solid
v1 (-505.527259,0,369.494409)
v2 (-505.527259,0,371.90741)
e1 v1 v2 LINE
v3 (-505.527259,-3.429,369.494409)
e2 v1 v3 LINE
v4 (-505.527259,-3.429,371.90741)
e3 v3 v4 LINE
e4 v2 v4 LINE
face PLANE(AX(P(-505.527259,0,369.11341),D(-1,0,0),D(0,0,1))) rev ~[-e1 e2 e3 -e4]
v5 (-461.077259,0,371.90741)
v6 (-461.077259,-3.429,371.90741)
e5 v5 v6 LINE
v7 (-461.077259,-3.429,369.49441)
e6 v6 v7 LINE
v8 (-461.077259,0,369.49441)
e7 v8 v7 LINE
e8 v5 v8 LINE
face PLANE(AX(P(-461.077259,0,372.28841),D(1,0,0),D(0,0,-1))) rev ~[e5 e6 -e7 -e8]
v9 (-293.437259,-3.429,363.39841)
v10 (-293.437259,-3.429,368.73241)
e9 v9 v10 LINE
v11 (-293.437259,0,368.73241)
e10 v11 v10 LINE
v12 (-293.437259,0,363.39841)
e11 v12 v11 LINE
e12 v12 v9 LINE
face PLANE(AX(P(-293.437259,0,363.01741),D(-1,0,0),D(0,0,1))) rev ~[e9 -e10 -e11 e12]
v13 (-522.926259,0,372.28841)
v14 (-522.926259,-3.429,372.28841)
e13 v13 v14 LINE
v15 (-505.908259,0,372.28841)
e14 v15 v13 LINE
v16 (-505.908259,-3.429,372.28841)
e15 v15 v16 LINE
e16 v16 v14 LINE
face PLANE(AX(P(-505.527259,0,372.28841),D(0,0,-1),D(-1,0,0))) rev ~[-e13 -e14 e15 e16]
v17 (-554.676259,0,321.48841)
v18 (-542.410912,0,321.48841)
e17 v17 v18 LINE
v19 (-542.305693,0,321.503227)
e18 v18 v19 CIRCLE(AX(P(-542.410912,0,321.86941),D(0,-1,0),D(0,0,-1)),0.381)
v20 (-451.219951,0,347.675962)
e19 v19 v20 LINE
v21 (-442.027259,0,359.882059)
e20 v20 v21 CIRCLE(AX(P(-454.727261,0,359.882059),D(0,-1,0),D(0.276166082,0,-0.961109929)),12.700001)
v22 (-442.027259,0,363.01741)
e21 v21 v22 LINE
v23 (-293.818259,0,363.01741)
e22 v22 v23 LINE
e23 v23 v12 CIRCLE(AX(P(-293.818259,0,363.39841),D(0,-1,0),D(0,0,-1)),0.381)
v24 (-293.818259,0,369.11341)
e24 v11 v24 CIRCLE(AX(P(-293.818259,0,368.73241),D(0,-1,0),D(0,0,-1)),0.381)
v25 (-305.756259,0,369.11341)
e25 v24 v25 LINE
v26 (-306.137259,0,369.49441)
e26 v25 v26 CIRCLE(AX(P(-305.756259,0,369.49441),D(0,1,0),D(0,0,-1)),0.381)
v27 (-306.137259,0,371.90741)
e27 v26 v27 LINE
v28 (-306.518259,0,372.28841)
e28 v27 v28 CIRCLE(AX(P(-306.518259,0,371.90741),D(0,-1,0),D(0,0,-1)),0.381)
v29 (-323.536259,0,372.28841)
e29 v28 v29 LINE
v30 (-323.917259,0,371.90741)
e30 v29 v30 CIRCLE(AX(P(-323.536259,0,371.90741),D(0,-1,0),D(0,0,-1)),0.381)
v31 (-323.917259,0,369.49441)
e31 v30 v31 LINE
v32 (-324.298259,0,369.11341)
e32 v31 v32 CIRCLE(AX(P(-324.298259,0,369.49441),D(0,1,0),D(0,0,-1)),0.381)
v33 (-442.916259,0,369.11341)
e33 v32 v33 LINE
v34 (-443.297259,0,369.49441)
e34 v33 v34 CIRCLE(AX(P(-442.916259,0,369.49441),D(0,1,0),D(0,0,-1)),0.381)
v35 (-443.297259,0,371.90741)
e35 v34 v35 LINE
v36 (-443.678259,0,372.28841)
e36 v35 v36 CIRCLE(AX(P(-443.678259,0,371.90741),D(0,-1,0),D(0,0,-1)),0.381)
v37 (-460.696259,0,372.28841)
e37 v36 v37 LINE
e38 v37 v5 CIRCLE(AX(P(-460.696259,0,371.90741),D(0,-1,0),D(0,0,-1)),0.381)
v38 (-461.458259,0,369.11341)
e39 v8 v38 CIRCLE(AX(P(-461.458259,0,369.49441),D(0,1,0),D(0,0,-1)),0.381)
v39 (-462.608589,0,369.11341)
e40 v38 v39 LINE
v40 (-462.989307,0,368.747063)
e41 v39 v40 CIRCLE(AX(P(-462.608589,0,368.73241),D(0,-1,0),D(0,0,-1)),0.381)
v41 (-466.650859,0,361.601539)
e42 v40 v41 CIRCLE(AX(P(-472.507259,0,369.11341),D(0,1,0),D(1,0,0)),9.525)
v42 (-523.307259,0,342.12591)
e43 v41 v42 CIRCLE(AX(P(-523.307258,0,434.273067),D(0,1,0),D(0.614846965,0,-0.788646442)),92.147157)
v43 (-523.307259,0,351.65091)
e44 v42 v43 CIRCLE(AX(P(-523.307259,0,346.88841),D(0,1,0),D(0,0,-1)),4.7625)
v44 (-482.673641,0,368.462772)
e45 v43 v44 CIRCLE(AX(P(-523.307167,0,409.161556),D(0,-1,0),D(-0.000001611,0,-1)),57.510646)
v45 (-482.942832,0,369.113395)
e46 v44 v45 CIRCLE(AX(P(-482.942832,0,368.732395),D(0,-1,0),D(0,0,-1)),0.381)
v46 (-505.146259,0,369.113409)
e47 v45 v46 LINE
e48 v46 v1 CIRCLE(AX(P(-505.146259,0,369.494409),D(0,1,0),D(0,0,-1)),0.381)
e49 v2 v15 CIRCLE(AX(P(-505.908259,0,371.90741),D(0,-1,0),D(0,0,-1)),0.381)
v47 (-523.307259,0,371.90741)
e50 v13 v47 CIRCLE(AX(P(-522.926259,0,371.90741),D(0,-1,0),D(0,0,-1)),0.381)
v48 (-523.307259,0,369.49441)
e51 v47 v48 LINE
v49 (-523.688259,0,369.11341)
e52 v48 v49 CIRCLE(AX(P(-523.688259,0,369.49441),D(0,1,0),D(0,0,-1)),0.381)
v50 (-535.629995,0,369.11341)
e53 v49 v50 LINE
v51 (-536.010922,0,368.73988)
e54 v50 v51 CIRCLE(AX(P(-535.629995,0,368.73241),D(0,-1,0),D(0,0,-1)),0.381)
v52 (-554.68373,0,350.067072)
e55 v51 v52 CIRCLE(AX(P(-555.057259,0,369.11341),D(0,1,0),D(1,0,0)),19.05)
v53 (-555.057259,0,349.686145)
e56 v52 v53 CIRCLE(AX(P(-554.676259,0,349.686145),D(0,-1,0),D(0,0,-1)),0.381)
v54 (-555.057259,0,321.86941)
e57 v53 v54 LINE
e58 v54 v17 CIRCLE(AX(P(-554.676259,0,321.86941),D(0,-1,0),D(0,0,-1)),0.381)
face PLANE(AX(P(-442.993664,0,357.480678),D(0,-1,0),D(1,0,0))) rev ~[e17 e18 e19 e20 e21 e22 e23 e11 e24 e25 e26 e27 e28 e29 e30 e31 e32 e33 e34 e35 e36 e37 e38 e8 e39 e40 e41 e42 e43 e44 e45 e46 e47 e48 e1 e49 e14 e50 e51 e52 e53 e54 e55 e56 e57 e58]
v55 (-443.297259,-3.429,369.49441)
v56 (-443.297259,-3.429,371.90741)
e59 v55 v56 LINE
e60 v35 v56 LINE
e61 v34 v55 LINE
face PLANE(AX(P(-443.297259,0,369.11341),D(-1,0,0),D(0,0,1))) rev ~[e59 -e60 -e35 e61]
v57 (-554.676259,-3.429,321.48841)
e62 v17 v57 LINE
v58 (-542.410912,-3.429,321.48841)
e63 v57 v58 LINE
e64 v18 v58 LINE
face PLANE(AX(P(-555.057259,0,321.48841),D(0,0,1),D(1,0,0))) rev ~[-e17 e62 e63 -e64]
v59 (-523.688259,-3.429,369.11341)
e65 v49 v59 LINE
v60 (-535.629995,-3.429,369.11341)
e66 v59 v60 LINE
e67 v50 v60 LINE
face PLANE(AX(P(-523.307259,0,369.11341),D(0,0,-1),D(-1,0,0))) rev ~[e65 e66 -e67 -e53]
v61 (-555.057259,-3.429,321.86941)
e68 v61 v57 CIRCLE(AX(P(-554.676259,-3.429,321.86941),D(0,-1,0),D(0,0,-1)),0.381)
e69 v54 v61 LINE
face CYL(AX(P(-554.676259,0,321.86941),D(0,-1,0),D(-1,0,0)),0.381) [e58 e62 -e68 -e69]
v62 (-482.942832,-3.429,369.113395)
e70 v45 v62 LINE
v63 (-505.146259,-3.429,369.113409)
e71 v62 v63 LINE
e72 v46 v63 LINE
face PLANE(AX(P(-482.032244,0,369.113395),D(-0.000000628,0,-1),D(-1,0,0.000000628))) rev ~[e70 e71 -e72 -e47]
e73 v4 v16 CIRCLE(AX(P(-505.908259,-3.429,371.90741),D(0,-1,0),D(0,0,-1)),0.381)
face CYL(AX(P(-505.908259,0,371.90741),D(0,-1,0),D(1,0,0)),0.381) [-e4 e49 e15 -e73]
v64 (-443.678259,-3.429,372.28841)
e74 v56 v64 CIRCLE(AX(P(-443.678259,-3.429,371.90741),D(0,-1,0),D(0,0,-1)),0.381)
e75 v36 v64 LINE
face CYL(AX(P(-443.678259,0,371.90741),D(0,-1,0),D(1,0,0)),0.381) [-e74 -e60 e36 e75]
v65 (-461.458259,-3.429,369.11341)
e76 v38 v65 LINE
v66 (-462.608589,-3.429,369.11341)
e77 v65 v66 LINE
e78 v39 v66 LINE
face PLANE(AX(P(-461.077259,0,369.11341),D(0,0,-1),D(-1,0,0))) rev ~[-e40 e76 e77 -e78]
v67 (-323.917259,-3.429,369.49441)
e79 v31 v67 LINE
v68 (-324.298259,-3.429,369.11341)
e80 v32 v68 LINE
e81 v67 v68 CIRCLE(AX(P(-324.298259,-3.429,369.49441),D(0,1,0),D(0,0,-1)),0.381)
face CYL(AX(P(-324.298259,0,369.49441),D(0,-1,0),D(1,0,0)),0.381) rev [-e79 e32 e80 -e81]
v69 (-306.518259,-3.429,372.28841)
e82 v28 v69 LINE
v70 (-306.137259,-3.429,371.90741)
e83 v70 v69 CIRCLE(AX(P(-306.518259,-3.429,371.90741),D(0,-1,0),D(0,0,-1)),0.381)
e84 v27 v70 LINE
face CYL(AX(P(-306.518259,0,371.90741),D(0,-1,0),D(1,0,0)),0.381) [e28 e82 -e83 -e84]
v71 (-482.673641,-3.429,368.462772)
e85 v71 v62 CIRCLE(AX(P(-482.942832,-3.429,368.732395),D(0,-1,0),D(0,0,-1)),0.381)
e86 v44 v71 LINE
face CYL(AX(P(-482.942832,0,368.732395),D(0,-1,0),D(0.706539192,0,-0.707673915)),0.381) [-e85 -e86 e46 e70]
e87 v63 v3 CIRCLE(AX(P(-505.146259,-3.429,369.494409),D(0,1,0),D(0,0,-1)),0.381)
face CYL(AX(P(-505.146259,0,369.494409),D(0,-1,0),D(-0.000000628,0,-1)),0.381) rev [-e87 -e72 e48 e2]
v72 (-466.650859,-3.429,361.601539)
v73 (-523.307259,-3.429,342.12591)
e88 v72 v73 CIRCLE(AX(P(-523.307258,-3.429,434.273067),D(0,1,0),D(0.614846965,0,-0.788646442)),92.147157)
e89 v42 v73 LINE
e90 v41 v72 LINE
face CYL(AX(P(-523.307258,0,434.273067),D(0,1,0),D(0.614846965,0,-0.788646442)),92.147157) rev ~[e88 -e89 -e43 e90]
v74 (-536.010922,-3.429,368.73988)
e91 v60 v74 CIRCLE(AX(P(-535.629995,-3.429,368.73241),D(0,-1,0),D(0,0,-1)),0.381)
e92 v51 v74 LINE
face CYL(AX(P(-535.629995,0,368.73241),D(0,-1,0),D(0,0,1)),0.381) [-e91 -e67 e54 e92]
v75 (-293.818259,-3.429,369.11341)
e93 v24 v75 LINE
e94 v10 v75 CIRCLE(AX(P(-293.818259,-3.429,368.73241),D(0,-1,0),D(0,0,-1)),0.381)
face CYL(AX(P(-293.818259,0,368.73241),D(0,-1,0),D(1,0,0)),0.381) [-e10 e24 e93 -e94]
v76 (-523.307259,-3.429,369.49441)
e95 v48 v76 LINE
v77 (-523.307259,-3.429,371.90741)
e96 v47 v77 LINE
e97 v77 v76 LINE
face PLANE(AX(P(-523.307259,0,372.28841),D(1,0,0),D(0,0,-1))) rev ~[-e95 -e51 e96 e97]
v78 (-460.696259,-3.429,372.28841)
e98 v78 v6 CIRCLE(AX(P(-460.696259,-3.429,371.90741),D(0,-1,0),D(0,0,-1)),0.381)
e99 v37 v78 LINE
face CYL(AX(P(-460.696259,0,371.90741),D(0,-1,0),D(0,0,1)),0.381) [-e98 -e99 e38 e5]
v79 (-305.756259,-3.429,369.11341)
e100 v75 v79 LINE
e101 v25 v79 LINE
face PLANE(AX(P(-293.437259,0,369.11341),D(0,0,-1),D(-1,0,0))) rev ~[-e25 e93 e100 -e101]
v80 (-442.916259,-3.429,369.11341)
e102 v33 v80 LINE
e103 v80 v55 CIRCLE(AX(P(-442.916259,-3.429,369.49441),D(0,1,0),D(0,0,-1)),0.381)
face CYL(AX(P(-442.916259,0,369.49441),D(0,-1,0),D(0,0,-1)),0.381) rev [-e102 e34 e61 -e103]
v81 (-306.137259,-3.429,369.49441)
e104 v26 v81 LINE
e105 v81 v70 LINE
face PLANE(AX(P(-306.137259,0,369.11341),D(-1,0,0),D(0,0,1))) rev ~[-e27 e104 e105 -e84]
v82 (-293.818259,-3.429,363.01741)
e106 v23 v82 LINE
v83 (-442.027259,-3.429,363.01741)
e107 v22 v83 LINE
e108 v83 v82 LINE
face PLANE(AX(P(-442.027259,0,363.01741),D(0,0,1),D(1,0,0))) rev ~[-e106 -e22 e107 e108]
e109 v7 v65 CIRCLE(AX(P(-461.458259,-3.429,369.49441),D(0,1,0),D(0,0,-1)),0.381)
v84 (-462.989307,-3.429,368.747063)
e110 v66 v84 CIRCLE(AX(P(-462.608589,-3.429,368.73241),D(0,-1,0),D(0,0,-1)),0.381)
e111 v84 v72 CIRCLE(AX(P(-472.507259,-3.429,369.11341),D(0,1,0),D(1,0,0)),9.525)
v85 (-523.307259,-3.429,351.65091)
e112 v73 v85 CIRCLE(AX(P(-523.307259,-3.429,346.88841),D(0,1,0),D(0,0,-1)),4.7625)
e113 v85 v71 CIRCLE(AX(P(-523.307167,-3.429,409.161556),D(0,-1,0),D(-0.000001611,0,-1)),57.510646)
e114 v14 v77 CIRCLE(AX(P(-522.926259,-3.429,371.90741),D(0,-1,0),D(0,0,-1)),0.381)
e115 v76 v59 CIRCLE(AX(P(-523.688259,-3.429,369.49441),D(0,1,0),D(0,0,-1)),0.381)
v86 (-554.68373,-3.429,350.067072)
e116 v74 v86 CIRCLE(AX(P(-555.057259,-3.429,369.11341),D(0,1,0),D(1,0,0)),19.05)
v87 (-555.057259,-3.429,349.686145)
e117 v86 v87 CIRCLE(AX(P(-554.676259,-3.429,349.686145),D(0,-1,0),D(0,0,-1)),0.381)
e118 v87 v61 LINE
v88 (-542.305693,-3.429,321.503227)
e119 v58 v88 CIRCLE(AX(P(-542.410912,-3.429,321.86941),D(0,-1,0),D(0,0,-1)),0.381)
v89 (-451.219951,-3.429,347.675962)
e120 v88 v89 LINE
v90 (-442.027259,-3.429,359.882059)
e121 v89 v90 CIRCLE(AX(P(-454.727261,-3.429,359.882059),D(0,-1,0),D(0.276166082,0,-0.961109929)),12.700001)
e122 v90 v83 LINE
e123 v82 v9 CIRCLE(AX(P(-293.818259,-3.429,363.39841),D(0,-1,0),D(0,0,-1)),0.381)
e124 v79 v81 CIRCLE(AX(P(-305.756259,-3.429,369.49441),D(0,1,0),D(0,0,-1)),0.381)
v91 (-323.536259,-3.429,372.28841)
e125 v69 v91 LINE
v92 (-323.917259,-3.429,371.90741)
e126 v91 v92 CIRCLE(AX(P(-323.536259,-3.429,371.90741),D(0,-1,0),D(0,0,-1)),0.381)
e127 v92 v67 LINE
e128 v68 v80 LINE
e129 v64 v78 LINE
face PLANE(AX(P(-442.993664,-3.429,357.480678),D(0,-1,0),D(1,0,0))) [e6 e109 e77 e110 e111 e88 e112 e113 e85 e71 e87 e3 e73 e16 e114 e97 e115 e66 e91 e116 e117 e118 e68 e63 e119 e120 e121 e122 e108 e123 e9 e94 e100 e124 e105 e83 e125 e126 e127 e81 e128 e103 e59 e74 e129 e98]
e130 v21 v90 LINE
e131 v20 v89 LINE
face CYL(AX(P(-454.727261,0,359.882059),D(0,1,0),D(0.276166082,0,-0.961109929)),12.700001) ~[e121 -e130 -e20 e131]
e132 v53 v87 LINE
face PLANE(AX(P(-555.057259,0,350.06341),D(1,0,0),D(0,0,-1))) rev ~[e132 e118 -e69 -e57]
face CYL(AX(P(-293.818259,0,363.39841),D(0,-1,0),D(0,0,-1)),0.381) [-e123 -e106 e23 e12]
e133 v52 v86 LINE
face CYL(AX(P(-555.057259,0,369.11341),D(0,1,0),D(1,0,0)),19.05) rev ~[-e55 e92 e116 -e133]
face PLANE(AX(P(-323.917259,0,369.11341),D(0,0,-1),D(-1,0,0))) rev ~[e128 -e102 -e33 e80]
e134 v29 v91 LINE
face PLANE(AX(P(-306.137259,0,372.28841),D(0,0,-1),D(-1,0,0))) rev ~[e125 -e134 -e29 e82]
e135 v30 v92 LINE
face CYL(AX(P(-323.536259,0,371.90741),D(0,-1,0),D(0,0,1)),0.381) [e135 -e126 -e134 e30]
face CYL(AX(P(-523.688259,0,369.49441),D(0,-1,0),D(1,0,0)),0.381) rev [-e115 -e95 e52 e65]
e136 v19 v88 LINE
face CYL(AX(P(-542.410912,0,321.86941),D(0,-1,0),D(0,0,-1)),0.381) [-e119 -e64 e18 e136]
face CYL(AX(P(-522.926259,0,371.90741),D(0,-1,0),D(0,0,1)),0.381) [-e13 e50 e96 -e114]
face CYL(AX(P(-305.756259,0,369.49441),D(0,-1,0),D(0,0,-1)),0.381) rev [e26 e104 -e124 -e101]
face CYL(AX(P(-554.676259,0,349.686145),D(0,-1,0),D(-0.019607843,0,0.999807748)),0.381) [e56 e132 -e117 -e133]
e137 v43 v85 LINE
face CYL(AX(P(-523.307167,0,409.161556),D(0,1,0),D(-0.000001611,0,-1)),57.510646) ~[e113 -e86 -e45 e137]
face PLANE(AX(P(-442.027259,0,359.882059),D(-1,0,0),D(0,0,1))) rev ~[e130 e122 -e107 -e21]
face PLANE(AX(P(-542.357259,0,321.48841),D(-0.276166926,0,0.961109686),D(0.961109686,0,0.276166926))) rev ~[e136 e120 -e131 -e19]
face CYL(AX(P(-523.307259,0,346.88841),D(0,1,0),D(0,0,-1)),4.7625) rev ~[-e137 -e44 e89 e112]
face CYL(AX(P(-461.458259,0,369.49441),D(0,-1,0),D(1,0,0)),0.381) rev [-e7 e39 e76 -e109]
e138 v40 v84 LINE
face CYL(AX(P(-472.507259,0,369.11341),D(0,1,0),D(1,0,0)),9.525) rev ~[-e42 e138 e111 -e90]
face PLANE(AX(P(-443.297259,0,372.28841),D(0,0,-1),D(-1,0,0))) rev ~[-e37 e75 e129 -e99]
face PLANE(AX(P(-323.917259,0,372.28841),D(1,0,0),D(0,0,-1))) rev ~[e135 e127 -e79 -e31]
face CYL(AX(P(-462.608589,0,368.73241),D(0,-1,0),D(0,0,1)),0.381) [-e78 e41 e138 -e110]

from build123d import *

# Parameters (mm, degrees)
F1_DEPTH = 3.429
F2_R     = 0.381


# Not quite as in the source:
# - ends of sketch curves that miss each other by under 0.0002 mm in the source are joined


with BuildPart() as f1:
    # F0 (on Front) → F1 (new body)
    with BuildSketch(Plane.XZ):
        with BuildLine():
            ThreePointArc((-523.3072592, 342.1259096), (-528.0697592, 346.8884096), (-523.3072592, 351.6509096))
            ThreePointArc((-523.3072592, 351.6509096), (-500.8987443088, 356.1961233076), (-482.0322439898, 369.1133948419))
            Line((-482.0322439898, 369.1133948419), (-505.5272592, 369.1134096))
            Line((-505.5272592, 369.1134096), (-505.5272592, 372.2884096))
            Line((-505.5272592, 372.2884096), (-523.3072592, 372.2884096))
            Line((-523.3072592, 372.2884096), (-523.3072592, 369.1134096))
            Line((-523.3072592, 369.1134096), (-536.0072592, 369.1134096))
            ThreePointArc((-536.0072592, 369.1134096), (-541.5868750184, 355.6430254184), (-555.0572592, 350.0634096))
            Line((-555.0572592, 350.0634096), (-555.0572592, 321.4884096))
            Line((-555.0572592, 321.4884096), (-542.3572592, 321.4884096))
            Line((-542.3572592, 321.4884096), (-451.219951, 347.675962))
            ThreePointArc((-451.219951, 347.675962), (-444.5824868492, 352.2417976203), (-442.0272592, 359.882059))
            Line((-442.0272592, 359.882059), (-442.0272592, 363.0174096))
            Line((-442.0272592, 363.0174096), (-293.4372592, 363.0174096))
            Line((-293.4372592, 363.0174096), (-293.4372592, 369.1134096))
            Line((-293.4372592, 369.1134096), (-306.1372592, 369.1134096))
            Line((-306.1372592, 369.1134096), (-306.1372592, 372.2884096))
            Line((-306.1372592, 372.2884096), (-323.9172592, 372.2884096))
            Line((-323.9172592, 372.2884096), (-323.9172592, 369.1134096))
            Line((-323.9172592, 369.1134096), (-443.2972592, 369.1134096))
            Line((-443.2972592, 369.1134096), (-443.2972592, 372.2884096))
            Line((-443.2972592, 372.2884096), (-461.0772592, 372.2884096))
            Line((-461.0772592, 372.2884096), (-461.0772592, 369.1134096))
            Line((-461.0772592, 369.1134096), (-462.9822592, 369.1134096))
            ThreePointArc((-462.9822592, 369.1134096), (-463.9484088233, 364.9334927075), (-466.650858723, 361.601539097))
            ThreePointArc((-466.650858723, 361.601539097), (-493.3520932085, 347.1307312076), (-523.3072592, 342.1259096))
        make_face()
    extrude(amount=F1_DEPTH)

    # F2
    f2_edges = [f1.edges().sort_by_distance(p)[0] for p in [
        (-482.032244, -1.7145, 369.113395),
        (-461.077259, -1.7145, 372.28841),
        (-461.077259, -1.7145, 369.11341),
        (-462.982259, -1.7145, 369.11341),
        (-505.527259, -1.7145, 372.28841),
        (-523.307259, -1.7145, 372.28841),
        (-523.307259, -1.7145, 369.11341),
        (-536.007259, -1.7145, 369.11341),
        (-505.527259, -1.7145, 369.11341),
        (-555.057259, -1.7145, 350.06341),
        (-443.297259, -1.7145, 369.11341),
        (-443.297259, -1.7145, 372.28841),
        (-323.917259, -1.7145, 372.28841),
        (-306.137259, -1.7145, 372.28841),
        (-306.137259, -1.7145, 369.11341),
        (-323.917259, -1.7145, 369.11341),
        (-293.437259, -1.7145, 369.11341),
        (-293.437259, -1.7145, 363.01741),
        (-542.357259, -1.7145, 321.48841),
        (-555.057259, -1.7145, 321.48841),
    ]]
    fillet(f2_edges, radius=F2_R)


solid = f1.part
